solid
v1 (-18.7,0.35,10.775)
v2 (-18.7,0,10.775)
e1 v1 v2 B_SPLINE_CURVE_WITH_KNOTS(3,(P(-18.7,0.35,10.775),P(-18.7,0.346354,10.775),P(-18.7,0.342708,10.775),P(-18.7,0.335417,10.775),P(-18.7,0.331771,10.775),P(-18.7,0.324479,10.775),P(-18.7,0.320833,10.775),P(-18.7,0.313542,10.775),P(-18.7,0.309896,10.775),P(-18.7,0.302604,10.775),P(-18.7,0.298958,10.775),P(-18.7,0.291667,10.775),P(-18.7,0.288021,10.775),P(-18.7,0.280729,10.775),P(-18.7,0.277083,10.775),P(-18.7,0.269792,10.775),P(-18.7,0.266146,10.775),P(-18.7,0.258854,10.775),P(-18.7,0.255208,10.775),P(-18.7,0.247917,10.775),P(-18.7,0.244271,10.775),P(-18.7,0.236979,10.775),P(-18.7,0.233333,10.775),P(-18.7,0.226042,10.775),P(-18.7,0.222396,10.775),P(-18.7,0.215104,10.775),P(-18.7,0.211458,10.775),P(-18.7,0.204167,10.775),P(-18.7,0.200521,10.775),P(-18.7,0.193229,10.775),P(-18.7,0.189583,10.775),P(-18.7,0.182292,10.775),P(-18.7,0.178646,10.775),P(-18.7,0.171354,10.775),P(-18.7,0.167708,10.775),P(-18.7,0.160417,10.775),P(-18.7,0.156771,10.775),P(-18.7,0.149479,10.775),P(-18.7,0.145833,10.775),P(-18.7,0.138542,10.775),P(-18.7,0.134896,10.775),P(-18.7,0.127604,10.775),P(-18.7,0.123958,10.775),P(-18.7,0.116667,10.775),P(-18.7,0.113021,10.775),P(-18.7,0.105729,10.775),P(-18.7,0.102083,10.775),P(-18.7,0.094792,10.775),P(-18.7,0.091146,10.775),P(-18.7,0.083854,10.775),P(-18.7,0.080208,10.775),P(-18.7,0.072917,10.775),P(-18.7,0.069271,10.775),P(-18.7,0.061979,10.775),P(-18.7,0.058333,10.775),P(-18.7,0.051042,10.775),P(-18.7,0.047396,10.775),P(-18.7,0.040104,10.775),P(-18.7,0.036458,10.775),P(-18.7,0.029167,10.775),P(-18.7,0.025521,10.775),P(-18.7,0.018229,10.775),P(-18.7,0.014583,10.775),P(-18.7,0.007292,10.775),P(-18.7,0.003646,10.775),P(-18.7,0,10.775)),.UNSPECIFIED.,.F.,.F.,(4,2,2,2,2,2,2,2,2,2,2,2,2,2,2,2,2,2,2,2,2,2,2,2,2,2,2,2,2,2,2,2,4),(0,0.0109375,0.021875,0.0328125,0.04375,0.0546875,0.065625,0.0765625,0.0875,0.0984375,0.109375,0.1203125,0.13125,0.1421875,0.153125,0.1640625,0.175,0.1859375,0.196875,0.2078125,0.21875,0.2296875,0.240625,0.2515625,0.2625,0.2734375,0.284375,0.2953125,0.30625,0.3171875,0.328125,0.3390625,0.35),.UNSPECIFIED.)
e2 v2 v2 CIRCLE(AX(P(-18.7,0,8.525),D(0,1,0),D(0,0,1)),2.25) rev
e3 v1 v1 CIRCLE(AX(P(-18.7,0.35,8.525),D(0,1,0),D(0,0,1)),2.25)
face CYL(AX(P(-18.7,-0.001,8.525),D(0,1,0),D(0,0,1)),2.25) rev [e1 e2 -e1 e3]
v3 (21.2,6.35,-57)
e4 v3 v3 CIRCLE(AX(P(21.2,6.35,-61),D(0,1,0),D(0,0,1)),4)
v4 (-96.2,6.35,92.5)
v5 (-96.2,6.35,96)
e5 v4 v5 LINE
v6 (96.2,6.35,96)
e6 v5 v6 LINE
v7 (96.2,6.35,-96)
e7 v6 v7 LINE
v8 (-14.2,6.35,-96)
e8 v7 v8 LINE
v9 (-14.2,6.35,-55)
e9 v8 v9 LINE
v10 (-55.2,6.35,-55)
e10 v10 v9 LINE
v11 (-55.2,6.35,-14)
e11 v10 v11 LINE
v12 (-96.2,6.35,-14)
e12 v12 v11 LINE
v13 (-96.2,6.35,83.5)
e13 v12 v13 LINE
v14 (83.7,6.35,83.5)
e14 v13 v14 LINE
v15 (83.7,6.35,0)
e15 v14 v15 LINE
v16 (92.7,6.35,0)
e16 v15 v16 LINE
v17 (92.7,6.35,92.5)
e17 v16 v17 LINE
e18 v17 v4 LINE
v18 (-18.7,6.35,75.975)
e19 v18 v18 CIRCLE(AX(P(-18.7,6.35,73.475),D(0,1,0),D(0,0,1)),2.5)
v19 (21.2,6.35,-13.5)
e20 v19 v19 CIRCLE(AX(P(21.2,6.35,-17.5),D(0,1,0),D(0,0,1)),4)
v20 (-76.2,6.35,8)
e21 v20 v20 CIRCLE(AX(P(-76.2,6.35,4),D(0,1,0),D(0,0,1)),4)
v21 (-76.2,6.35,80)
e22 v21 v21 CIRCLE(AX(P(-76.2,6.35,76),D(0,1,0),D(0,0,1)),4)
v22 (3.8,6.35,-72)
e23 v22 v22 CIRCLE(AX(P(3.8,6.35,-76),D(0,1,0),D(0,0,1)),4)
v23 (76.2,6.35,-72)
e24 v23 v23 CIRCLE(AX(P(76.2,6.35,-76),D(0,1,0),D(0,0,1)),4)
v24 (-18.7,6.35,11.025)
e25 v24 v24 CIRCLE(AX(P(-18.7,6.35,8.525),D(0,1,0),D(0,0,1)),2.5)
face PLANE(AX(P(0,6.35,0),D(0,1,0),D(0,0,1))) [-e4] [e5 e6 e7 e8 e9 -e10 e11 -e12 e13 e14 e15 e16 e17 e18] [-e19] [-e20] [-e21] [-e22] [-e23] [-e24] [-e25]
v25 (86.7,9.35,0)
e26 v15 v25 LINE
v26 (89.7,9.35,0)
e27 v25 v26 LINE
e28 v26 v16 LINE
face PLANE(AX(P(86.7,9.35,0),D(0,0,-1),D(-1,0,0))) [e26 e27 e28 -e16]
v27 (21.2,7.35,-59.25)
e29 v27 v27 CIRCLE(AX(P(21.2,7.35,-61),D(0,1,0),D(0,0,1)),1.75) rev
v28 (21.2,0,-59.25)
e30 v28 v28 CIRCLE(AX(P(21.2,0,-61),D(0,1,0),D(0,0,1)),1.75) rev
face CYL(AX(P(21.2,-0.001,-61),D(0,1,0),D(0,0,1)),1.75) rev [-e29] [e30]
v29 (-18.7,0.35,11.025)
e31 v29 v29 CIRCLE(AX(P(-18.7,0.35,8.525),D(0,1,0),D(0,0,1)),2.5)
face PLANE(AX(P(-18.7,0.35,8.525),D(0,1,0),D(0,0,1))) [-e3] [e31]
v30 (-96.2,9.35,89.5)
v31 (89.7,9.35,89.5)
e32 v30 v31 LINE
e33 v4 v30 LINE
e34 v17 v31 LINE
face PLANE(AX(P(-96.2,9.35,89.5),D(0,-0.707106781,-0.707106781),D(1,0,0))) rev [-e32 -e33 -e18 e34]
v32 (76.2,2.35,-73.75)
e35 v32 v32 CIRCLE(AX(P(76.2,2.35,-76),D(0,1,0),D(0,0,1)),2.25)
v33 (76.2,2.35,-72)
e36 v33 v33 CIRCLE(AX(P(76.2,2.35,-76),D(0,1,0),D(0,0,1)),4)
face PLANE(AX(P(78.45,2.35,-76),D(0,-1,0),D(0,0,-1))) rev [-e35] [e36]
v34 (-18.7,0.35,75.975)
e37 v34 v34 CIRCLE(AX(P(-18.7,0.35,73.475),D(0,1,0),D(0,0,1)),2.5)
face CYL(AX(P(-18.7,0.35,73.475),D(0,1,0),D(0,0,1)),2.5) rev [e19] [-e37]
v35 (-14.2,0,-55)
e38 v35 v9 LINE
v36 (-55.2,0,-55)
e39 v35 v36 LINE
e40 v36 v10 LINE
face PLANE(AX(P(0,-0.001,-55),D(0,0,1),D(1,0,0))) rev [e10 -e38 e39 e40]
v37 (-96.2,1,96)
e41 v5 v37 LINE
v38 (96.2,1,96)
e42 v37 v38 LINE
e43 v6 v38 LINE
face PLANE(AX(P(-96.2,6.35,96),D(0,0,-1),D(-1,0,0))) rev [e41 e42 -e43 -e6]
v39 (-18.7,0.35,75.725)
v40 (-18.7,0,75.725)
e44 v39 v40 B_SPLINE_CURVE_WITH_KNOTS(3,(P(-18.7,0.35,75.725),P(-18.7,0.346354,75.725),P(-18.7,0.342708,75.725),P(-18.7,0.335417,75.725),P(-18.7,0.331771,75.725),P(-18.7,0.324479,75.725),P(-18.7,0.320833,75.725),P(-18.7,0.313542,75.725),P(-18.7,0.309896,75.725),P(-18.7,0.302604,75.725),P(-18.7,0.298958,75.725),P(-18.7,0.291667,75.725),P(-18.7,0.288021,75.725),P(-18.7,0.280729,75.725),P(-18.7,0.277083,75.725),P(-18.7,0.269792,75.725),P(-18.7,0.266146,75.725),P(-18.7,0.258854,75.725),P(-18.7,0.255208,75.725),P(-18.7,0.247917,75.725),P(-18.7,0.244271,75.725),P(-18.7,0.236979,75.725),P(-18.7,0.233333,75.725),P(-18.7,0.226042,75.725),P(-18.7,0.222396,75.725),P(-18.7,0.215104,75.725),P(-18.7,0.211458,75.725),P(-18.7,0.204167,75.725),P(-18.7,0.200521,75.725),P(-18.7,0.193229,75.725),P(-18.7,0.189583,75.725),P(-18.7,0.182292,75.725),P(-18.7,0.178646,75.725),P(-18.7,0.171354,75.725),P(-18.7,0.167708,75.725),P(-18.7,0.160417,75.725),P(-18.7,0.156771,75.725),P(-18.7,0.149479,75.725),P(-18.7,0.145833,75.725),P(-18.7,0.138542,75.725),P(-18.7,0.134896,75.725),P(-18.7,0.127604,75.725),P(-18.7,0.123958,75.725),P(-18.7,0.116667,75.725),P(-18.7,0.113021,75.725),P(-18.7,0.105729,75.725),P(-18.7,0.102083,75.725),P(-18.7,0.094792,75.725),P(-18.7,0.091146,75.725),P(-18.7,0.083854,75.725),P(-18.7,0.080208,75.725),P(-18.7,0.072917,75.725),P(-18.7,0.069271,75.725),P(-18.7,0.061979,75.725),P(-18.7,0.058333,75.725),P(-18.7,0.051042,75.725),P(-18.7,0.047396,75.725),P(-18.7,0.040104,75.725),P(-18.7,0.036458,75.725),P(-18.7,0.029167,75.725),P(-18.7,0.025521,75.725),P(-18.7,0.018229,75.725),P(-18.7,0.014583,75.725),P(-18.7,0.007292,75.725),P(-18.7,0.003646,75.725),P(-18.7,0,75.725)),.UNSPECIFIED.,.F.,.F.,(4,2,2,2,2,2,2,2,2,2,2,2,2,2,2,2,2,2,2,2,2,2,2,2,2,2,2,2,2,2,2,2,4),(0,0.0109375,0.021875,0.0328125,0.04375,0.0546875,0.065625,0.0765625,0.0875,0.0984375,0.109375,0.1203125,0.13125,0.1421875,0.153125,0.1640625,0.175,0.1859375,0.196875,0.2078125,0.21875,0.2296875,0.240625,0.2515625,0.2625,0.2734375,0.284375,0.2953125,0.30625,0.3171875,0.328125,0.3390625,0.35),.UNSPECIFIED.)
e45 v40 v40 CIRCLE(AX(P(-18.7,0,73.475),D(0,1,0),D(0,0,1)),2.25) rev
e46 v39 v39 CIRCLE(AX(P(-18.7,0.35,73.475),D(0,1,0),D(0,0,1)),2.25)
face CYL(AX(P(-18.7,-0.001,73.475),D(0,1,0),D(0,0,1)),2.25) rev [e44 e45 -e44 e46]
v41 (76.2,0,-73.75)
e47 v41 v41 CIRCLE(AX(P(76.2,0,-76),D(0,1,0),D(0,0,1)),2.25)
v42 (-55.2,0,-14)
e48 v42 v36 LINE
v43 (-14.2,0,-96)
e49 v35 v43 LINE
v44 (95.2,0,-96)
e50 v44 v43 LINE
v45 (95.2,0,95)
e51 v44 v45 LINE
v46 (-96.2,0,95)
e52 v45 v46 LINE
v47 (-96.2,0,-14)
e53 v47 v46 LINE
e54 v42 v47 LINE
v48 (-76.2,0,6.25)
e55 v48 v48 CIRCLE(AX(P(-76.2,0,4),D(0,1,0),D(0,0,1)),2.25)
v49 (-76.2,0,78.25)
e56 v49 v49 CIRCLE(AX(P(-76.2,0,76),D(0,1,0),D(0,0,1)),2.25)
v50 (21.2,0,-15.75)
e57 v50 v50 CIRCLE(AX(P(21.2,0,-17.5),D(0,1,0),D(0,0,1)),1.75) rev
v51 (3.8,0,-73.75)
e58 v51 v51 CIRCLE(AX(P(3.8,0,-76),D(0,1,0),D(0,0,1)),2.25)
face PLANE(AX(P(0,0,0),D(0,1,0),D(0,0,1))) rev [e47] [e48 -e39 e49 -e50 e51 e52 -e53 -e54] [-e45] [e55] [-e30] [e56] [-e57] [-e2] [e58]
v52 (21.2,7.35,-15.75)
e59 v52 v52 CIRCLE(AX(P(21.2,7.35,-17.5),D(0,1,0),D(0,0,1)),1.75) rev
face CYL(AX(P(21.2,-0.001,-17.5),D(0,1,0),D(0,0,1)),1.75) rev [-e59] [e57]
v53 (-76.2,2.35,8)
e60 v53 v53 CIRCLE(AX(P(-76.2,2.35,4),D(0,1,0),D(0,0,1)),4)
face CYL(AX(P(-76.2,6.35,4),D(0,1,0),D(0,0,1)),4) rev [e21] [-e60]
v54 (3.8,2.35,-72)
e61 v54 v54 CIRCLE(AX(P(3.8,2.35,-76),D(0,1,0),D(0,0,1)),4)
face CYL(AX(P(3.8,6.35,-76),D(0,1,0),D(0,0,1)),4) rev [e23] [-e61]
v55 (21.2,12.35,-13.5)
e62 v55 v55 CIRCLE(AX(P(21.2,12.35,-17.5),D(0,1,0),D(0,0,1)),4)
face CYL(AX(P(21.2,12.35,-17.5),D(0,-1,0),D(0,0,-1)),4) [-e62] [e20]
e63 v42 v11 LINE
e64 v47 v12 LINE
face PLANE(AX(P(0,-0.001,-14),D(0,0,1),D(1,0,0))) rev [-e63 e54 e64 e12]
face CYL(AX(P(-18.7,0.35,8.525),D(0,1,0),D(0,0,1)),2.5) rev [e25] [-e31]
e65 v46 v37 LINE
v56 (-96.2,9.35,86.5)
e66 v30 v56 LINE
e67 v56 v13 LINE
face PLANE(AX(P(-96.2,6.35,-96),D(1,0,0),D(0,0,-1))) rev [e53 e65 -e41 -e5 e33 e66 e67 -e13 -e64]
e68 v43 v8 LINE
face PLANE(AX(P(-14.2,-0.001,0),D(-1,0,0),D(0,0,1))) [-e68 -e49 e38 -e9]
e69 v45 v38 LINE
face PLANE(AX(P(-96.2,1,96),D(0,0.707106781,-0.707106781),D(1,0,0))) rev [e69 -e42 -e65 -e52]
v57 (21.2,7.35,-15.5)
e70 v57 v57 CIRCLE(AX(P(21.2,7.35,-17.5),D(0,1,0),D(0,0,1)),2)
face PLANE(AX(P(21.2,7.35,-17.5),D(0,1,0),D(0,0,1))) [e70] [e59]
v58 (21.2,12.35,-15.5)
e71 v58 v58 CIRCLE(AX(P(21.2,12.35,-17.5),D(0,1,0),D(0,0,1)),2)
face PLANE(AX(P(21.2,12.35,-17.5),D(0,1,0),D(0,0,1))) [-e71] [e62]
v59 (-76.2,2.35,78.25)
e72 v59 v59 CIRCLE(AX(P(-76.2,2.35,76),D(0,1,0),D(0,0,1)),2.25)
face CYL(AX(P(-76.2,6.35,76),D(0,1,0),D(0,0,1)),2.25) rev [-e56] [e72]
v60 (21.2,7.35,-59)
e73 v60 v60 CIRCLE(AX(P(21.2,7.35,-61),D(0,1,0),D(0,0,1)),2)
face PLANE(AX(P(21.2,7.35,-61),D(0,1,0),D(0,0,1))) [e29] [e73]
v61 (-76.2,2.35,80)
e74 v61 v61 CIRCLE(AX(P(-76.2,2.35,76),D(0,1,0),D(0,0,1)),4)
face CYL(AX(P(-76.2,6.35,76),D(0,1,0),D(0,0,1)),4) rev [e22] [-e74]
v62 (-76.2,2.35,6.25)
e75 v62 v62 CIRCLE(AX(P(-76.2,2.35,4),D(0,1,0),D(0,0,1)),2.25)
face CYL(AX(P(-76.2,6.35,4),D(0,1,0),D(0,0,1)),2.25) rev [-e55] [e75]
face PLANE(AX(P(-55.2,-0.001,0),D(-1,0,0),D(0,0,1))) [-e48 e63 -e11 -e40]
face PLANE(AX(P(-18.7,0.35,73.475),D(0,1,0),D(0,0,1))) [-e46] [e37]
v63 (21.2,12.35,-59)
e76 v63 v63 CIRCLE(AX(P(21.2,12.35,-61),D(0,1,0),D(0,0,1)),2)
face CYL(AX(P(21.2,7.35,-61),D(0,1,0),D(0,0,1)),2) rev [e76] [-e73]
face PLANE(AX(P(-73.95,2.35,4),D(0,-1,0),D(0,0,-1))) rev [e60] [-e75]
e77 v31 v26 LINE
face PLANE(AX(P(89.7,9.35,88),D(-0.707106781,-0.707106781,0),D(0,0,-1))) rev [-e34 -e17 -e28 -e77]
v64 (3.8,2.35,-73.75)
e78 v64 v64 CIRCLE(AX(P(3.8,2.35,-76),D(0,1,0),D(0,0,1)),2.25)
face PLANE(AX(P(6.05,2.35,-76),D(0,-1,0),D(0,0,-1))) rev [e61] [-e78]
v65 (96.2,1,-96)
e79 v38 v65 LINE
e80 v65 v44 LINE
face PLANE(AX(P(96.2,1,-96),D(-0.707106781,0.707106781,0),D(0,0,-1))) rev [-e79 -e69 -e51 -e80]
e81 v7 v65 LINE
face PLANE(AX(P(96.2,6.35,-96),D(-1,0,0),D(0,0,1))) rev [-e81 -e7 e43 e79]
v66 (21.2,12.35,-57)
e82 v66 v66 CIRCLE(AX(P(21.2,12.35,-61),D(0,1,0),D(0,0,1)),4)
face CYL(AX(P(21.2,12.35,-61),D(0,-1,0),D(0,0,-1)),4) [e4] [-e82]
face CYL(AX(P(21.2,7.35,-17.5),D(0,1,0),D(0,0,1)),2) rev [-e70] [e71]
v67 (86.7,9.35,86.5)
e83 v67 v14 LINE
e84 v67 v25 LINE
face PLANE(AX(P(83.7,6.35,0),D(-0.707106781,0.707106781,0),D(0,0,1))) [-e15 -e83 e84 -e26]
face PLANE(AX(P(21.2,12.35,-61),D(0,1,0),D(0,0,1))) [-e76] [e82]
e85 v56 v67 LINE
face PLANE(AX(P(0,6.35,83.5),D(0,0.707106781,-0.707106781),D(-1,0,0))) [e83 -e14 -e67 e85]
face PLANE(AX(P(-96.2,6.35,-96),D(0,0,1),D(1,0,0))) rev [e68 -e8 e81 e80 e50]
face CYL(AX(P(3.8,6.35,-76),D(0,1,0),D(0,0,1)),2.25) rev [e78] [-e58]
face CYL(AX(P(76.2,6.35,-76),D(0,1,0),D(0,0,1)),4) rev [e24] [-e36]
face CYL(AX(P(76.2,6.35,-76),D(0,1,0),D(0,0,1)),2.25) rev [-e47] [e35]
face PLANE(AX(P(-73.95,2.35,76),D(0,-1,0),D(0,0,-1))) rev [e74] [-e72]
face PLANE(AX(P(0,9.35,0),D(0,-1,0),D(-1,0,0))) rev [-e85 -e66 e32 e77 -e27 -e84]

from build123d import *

# Parameters (mm, degrees)
SKETCH1_W                      = 192.4
SKETCH1_H                      = 192
BOSS_EXTRUDE1_DEPTH            = 6.35
CUT_EXTRUDE1_REACH             = 138.054
SKETCH2_W                      = 41
SKETCH2_H                      = 41
CBORE_FOR_M4_SHCS1_D           = 4.5
CBORE_FOR_M4_SHCS1_CBORE_D     = 8
CBORE_FOR_M4_SHCS1_CBORE_DEPTH = 4
SKETCH5_R                      = 2.5
CUT_EXTRUDE2_DEPTH             = 6
CUT_EXTRUDE3_REACH             = 138.038
SKETCH6_R                      = 2.25
CUT_EXTRUDE4_REACH             = 138.054
SKETCH7_R                      = 1.75
BOSS_EXTRUDE2_START            = 6
SKETCH11_R                     = 4
SKETCH11_R_2                   = 1.75
BOSS_EXTRUDE2_DEPTH            = 6
SKETCH8_R                      = 2
CUT_EXTRUDE5_DEPTH             = 5
EXTRUDE_THIN1_DEPTH            = 3
CHAMFER1_SIZE                  = 3
CHAMFER2_SIZE                  = 1


with BuildPart() as part:
    # Sketch1 → Boss-Extrude1 (new body)
    with BuildSketch(Plane(origin=(0, 0, 0), x_dir=(1, 0, 0), z_dir=(0, 1, 0))):
        Rectangle(SKETCH1_W, SKETCH1_H)
    extrude(amount=BOSS_EXTRUDE1_DEPTH)

    # Sketch2 → Cut-Extrude1 (cut, up to next)
    with BuildSketch(Plane(origin=(0, 6.35, 0), x_dir=(1, 0, 0), z_dir=(0, 1, 0)), mode=Mode.PRIVATE) as cut_extrude1_sk1:
        with Locations((-75.7, 34.5)):
            Rectangle(SKETCH2_W, SKETCH2_H)
    cut_extrude1_tool1 = extrude(cut_extrude1_sk1.sketch, amount=-CUT_EXTRUDE1_REACH, mode=Mode.PRIVATE) & part.part
    # Sketch2 → Cut-Extrude1 (cut, up to next)
    with BuildSketch(Plane(origin=(0, 6.35, 0), x_dir=(1, 0, 0), z_dir=(0, 1, 0)), mode=Mode.PRIVATE) as cut_extrude1_sk2:
        with Locations((-75.7, 75.5)):
            Rectangle(SKETCH2_W, SKETCH2_H)
    cut_extrude1_tool2 = extrude(cut_extrude1_sk2.sketch, amount=-CUT_EXTRUDE1_REACH, mode=Mode.PRIVATE) & part.part
    # Sketch2 → Cut-Extrude1 (cut, up to next)
    with BuildSketch(Plane(origin=(0, 6.35, 0), x_dir=(1, 0, 0), z_dir=(0, 1, 0)), mode=Mode.PRIVATE) as cut_extrude1_sk3:
        with Locations((-34.7, 75.5)):
            Rectangle(SKETCH2_W, SKETCH2_H)
    cut_extrude1_tool3 = extrude(cut_extrude1_sk3.sketch, amount=-CUT_EXTRUDE1_REACH, mode=Mode.PRIVATE) & part.part
    add(cut_extrude1_tool1.solids().sort_by_distance((-75.7, 6.35, -34.5))[0], mode=Mode.SUBTRACT)
    add(cut_extrude1_tool2.solids().sort_by_distance((-75.7, 6.35, -75.5))[0], mode=Mode.SUBTRACT)
    add(cut_extrude1_tool3.solids().sort_by_distance((-34.7, 6.35, -75.5))[0], mode=Mode.SUBTRACT)

    # CBORE for M4 SHCS1 (through all)
    with Locations(Plane(origin=(0, 6.35, 0), x_dir=(1, 0, 0), z_dir=(0, 1, 0))):
        with Locations((76.2, 76), (-76.2, -4), (-76.2, -76), (3.8, 76)):
            CounterBoreHole(CBORE_FOR_M4_SHCS1_D / 2, CBORE_FOR_M4_SHCS1_CBORE_D / 2, CBORE_FOR_M4_SHCS1_CBORE_DEPTH)

    # Sketch5 → Cut-Extrude2 (cut)
    with BuildSketch(Plane(origin=(0, 6.35, 0), x_dir=(1, 0, 0), z_dir=(0, 1, 0))):
        with Locations(Location((-18.7, -8.525, 0), (0, 0, 270))):
            Circle(SKETCH5_R)
        with Locations(Location((-18.7, -73.475, 0), (0, 0, 270))):
            Circle(SKETCH5_R)
    extrude(amount=-CUT_EXTRUDE2_DEPTH, mode=Mode.SUBTRACT)

    # Sketch6 → Cut-Extrude3 (cut, up to next)
    with BuildSketch(Plane(origin=(0, 0.35, 0), x_dir=(1, 0, 0), z_dir=(0, 1, 0)), mode=Mode.PRIVATE) as cut_extrude3_sk1:
        with Locations(Location((-18.7, -8.525, 0), (0, 0, 270))):
            Circle(SKETCH6_R)
    cut_extrude3_tool1 = extrude(cut_extrude3_sk1.sketch, amount=-CUT_EXTRUDE3_REACH, mode=Mode.PRIVATE) & part.part
    # Sketch6 → Cut-Extrude3 (cut, up to next)
    with BuildSketch(Plane(origin=(0, 0.35, 0), x_dir=(1, 0, 0), z_dir=(0, 1, 0)), mode=Mode.PRIVATE) as cut_extrude3_sk2:
        with Locations(Location((-18.7, -73.475, 0), (0, 0, 270))):
            Circle(SKETCH6_R)
    cut_extrude3_tool2 = extrude(cut_extrude3_sk2.sketch, amount=-CUT_EXTRUDE3_REACH, mode=Mode.PRIVATE) & part.part
    add(cut_extrude3_tool1.solids().sort_by_distance((-18.7, 0.35, 8.525))[0], mode=Mode.SUBTRACT)
    add(cut_extrude3_tool2.solids().sort_by_distance((-18.7, 0.35, 73.475))[0], mode=Mode.SUBTRACT)

    # Sketch7 → Cut-Extrude4 (cut, up to next)
    with BuildSketch(Plane(origin=(0, 6.35, 0), x_dir=(1, 0, 0), z_dir=(0, 1, 0)), mode=Mode.PRIVATE) as cut_extrude4_sk1:
        with Locations(Location((21.2, 61, 0), (0, 0, 270))):
            Circle(SKETCH7_R)
    cut_extrude4_tool1 = extrude(cut_extrude4_sk1.sketch, amount=-CUT_EXTRUDE4_REACH, mode=Mode.PRIVATE) & part.part
    # Sketch7 → Cut-Extrude4 (cut, up to next)
    with BuildSketch(Plane(origin=(0, 6.35, 0), x_dir=(1, 0, 0), z_dir=(0, 1, 0)), mode=Mode.PRIVATE) as cut_extrude4_sk2:
        with Locations(Location((21.2, 17.5, 0), (0, 0, 270))):
            Circle(SKETCH7_R)
    cut_extrude4_tool2 = extrude(cut_extrude4_sk2.sketch, amount=-CUT_EXTRUDE4_REACH, mode=Mode.PRIVATE) & part.part
    add(cut_extrude4_tool1.solids().sort_by_distance((21.2, 6.35, -61))[0], mode=Mode.SUBTRACT)
    add(cut_extrude4_tool2.solids().sort_by_distance((21.2, 6.35, -17.5))[0], mode=Mode.SUBTRACT)

    # Sketch11 → Boss-Extrude2 (add)
    # profile 1 of 2: a face of its own
    with BuildSketch(Plane(origin=(0, 6.35, 0), x_dir=(1, 0, 0), z_dir=(0, 1, 0)).offset(BOSS_EXTRUDE2_START)):
        with Locations(Location((21.2, 61, 0), (0, 0, 270))):
            Circle(SKETCH11_R)
        with Locations(Location((21.2, 61, 0), (0, 0, 270))):
            Circle(SKETCH11_R_2, mode=Mode.SUBTRACT)
    # profile 2 of 2: a face of its own
    with BuildSketch(Plane(origin=(0, 6.35, 0), x_dir=(1, 0, 0), z_dir=(0, 1, 0)).offset(BOSS_EXTRUDE2_START)):
        with Locations(Location((21.2, 17.5, 0), (0, 0, 270))):
            Circle(SKETCH11_R)
        with Locations(Location((21.2, 17.5, 0), (0, 0, 270))):
            Circle(SKETCH11_R_2, mode=Mode.SUBTRACT)
    extrude(amount=-BOSS_EXTRUDE2_DEPTH)

    # Sketch8 → Cut-Extrude5 (cut)
    with BuildSketch(Plane(origin=(0, 12.35, 0), x_dir=(1, 0, 0), z_dir=(0, 1, 0))):
        with Locations(Location((21.2, 61, 0), (0, 0, 270))):
            Circle(SKETCH8_R)
        with Locations(Location((21.2, 17.5, 0), (0, 0, 270))):
            Circle(SKETCH8_R)
    extrude(amount=-CUT_EXTRUDE5_DEPTH, mode=Mode.SUBTRACT)

    # Sketch9 → Extrude-Thin1 (add)
    with BuildSketch(Plane(origin=(0, 6.35, 0), x_dir=(1, 0, 0), z_dir=(0, 1, 0))):
        Polygon((-96.2, -89.5), (89.7, -89.5), (89.7, 0), (86.7, 0), (86.7, -86.5), (-96.2, -86.5), align=None)
    extrude(amount=EXTRUDE_THIN1_DEPTH)

    # Chamfer1
    chamfer1_edges = [part.edges().sort_by_distance(p)[0] for p in [
        (-4.75, 6.35, 86.5),
        (86.7, 6.35, 43.25),
        (-3.25, 6.35, 89.5),
        (89.7, 6.35, 44.75),
    ]]
    chamfer(chamfer1_edges, length=CHAMFER1_SIZE - 0.0001)  # a hair under: the kernel refuses the full size

    # Chamfer2
    chamfer2_edges = [part.edges().sort_by_distance(p)[0] for p in [
        (0, 0, 96),
        (96.2, 0, 0),
    ]]
    chamfer(chamfer2_edges, length=CHAMFER2_SIZE)


solid = part.part
